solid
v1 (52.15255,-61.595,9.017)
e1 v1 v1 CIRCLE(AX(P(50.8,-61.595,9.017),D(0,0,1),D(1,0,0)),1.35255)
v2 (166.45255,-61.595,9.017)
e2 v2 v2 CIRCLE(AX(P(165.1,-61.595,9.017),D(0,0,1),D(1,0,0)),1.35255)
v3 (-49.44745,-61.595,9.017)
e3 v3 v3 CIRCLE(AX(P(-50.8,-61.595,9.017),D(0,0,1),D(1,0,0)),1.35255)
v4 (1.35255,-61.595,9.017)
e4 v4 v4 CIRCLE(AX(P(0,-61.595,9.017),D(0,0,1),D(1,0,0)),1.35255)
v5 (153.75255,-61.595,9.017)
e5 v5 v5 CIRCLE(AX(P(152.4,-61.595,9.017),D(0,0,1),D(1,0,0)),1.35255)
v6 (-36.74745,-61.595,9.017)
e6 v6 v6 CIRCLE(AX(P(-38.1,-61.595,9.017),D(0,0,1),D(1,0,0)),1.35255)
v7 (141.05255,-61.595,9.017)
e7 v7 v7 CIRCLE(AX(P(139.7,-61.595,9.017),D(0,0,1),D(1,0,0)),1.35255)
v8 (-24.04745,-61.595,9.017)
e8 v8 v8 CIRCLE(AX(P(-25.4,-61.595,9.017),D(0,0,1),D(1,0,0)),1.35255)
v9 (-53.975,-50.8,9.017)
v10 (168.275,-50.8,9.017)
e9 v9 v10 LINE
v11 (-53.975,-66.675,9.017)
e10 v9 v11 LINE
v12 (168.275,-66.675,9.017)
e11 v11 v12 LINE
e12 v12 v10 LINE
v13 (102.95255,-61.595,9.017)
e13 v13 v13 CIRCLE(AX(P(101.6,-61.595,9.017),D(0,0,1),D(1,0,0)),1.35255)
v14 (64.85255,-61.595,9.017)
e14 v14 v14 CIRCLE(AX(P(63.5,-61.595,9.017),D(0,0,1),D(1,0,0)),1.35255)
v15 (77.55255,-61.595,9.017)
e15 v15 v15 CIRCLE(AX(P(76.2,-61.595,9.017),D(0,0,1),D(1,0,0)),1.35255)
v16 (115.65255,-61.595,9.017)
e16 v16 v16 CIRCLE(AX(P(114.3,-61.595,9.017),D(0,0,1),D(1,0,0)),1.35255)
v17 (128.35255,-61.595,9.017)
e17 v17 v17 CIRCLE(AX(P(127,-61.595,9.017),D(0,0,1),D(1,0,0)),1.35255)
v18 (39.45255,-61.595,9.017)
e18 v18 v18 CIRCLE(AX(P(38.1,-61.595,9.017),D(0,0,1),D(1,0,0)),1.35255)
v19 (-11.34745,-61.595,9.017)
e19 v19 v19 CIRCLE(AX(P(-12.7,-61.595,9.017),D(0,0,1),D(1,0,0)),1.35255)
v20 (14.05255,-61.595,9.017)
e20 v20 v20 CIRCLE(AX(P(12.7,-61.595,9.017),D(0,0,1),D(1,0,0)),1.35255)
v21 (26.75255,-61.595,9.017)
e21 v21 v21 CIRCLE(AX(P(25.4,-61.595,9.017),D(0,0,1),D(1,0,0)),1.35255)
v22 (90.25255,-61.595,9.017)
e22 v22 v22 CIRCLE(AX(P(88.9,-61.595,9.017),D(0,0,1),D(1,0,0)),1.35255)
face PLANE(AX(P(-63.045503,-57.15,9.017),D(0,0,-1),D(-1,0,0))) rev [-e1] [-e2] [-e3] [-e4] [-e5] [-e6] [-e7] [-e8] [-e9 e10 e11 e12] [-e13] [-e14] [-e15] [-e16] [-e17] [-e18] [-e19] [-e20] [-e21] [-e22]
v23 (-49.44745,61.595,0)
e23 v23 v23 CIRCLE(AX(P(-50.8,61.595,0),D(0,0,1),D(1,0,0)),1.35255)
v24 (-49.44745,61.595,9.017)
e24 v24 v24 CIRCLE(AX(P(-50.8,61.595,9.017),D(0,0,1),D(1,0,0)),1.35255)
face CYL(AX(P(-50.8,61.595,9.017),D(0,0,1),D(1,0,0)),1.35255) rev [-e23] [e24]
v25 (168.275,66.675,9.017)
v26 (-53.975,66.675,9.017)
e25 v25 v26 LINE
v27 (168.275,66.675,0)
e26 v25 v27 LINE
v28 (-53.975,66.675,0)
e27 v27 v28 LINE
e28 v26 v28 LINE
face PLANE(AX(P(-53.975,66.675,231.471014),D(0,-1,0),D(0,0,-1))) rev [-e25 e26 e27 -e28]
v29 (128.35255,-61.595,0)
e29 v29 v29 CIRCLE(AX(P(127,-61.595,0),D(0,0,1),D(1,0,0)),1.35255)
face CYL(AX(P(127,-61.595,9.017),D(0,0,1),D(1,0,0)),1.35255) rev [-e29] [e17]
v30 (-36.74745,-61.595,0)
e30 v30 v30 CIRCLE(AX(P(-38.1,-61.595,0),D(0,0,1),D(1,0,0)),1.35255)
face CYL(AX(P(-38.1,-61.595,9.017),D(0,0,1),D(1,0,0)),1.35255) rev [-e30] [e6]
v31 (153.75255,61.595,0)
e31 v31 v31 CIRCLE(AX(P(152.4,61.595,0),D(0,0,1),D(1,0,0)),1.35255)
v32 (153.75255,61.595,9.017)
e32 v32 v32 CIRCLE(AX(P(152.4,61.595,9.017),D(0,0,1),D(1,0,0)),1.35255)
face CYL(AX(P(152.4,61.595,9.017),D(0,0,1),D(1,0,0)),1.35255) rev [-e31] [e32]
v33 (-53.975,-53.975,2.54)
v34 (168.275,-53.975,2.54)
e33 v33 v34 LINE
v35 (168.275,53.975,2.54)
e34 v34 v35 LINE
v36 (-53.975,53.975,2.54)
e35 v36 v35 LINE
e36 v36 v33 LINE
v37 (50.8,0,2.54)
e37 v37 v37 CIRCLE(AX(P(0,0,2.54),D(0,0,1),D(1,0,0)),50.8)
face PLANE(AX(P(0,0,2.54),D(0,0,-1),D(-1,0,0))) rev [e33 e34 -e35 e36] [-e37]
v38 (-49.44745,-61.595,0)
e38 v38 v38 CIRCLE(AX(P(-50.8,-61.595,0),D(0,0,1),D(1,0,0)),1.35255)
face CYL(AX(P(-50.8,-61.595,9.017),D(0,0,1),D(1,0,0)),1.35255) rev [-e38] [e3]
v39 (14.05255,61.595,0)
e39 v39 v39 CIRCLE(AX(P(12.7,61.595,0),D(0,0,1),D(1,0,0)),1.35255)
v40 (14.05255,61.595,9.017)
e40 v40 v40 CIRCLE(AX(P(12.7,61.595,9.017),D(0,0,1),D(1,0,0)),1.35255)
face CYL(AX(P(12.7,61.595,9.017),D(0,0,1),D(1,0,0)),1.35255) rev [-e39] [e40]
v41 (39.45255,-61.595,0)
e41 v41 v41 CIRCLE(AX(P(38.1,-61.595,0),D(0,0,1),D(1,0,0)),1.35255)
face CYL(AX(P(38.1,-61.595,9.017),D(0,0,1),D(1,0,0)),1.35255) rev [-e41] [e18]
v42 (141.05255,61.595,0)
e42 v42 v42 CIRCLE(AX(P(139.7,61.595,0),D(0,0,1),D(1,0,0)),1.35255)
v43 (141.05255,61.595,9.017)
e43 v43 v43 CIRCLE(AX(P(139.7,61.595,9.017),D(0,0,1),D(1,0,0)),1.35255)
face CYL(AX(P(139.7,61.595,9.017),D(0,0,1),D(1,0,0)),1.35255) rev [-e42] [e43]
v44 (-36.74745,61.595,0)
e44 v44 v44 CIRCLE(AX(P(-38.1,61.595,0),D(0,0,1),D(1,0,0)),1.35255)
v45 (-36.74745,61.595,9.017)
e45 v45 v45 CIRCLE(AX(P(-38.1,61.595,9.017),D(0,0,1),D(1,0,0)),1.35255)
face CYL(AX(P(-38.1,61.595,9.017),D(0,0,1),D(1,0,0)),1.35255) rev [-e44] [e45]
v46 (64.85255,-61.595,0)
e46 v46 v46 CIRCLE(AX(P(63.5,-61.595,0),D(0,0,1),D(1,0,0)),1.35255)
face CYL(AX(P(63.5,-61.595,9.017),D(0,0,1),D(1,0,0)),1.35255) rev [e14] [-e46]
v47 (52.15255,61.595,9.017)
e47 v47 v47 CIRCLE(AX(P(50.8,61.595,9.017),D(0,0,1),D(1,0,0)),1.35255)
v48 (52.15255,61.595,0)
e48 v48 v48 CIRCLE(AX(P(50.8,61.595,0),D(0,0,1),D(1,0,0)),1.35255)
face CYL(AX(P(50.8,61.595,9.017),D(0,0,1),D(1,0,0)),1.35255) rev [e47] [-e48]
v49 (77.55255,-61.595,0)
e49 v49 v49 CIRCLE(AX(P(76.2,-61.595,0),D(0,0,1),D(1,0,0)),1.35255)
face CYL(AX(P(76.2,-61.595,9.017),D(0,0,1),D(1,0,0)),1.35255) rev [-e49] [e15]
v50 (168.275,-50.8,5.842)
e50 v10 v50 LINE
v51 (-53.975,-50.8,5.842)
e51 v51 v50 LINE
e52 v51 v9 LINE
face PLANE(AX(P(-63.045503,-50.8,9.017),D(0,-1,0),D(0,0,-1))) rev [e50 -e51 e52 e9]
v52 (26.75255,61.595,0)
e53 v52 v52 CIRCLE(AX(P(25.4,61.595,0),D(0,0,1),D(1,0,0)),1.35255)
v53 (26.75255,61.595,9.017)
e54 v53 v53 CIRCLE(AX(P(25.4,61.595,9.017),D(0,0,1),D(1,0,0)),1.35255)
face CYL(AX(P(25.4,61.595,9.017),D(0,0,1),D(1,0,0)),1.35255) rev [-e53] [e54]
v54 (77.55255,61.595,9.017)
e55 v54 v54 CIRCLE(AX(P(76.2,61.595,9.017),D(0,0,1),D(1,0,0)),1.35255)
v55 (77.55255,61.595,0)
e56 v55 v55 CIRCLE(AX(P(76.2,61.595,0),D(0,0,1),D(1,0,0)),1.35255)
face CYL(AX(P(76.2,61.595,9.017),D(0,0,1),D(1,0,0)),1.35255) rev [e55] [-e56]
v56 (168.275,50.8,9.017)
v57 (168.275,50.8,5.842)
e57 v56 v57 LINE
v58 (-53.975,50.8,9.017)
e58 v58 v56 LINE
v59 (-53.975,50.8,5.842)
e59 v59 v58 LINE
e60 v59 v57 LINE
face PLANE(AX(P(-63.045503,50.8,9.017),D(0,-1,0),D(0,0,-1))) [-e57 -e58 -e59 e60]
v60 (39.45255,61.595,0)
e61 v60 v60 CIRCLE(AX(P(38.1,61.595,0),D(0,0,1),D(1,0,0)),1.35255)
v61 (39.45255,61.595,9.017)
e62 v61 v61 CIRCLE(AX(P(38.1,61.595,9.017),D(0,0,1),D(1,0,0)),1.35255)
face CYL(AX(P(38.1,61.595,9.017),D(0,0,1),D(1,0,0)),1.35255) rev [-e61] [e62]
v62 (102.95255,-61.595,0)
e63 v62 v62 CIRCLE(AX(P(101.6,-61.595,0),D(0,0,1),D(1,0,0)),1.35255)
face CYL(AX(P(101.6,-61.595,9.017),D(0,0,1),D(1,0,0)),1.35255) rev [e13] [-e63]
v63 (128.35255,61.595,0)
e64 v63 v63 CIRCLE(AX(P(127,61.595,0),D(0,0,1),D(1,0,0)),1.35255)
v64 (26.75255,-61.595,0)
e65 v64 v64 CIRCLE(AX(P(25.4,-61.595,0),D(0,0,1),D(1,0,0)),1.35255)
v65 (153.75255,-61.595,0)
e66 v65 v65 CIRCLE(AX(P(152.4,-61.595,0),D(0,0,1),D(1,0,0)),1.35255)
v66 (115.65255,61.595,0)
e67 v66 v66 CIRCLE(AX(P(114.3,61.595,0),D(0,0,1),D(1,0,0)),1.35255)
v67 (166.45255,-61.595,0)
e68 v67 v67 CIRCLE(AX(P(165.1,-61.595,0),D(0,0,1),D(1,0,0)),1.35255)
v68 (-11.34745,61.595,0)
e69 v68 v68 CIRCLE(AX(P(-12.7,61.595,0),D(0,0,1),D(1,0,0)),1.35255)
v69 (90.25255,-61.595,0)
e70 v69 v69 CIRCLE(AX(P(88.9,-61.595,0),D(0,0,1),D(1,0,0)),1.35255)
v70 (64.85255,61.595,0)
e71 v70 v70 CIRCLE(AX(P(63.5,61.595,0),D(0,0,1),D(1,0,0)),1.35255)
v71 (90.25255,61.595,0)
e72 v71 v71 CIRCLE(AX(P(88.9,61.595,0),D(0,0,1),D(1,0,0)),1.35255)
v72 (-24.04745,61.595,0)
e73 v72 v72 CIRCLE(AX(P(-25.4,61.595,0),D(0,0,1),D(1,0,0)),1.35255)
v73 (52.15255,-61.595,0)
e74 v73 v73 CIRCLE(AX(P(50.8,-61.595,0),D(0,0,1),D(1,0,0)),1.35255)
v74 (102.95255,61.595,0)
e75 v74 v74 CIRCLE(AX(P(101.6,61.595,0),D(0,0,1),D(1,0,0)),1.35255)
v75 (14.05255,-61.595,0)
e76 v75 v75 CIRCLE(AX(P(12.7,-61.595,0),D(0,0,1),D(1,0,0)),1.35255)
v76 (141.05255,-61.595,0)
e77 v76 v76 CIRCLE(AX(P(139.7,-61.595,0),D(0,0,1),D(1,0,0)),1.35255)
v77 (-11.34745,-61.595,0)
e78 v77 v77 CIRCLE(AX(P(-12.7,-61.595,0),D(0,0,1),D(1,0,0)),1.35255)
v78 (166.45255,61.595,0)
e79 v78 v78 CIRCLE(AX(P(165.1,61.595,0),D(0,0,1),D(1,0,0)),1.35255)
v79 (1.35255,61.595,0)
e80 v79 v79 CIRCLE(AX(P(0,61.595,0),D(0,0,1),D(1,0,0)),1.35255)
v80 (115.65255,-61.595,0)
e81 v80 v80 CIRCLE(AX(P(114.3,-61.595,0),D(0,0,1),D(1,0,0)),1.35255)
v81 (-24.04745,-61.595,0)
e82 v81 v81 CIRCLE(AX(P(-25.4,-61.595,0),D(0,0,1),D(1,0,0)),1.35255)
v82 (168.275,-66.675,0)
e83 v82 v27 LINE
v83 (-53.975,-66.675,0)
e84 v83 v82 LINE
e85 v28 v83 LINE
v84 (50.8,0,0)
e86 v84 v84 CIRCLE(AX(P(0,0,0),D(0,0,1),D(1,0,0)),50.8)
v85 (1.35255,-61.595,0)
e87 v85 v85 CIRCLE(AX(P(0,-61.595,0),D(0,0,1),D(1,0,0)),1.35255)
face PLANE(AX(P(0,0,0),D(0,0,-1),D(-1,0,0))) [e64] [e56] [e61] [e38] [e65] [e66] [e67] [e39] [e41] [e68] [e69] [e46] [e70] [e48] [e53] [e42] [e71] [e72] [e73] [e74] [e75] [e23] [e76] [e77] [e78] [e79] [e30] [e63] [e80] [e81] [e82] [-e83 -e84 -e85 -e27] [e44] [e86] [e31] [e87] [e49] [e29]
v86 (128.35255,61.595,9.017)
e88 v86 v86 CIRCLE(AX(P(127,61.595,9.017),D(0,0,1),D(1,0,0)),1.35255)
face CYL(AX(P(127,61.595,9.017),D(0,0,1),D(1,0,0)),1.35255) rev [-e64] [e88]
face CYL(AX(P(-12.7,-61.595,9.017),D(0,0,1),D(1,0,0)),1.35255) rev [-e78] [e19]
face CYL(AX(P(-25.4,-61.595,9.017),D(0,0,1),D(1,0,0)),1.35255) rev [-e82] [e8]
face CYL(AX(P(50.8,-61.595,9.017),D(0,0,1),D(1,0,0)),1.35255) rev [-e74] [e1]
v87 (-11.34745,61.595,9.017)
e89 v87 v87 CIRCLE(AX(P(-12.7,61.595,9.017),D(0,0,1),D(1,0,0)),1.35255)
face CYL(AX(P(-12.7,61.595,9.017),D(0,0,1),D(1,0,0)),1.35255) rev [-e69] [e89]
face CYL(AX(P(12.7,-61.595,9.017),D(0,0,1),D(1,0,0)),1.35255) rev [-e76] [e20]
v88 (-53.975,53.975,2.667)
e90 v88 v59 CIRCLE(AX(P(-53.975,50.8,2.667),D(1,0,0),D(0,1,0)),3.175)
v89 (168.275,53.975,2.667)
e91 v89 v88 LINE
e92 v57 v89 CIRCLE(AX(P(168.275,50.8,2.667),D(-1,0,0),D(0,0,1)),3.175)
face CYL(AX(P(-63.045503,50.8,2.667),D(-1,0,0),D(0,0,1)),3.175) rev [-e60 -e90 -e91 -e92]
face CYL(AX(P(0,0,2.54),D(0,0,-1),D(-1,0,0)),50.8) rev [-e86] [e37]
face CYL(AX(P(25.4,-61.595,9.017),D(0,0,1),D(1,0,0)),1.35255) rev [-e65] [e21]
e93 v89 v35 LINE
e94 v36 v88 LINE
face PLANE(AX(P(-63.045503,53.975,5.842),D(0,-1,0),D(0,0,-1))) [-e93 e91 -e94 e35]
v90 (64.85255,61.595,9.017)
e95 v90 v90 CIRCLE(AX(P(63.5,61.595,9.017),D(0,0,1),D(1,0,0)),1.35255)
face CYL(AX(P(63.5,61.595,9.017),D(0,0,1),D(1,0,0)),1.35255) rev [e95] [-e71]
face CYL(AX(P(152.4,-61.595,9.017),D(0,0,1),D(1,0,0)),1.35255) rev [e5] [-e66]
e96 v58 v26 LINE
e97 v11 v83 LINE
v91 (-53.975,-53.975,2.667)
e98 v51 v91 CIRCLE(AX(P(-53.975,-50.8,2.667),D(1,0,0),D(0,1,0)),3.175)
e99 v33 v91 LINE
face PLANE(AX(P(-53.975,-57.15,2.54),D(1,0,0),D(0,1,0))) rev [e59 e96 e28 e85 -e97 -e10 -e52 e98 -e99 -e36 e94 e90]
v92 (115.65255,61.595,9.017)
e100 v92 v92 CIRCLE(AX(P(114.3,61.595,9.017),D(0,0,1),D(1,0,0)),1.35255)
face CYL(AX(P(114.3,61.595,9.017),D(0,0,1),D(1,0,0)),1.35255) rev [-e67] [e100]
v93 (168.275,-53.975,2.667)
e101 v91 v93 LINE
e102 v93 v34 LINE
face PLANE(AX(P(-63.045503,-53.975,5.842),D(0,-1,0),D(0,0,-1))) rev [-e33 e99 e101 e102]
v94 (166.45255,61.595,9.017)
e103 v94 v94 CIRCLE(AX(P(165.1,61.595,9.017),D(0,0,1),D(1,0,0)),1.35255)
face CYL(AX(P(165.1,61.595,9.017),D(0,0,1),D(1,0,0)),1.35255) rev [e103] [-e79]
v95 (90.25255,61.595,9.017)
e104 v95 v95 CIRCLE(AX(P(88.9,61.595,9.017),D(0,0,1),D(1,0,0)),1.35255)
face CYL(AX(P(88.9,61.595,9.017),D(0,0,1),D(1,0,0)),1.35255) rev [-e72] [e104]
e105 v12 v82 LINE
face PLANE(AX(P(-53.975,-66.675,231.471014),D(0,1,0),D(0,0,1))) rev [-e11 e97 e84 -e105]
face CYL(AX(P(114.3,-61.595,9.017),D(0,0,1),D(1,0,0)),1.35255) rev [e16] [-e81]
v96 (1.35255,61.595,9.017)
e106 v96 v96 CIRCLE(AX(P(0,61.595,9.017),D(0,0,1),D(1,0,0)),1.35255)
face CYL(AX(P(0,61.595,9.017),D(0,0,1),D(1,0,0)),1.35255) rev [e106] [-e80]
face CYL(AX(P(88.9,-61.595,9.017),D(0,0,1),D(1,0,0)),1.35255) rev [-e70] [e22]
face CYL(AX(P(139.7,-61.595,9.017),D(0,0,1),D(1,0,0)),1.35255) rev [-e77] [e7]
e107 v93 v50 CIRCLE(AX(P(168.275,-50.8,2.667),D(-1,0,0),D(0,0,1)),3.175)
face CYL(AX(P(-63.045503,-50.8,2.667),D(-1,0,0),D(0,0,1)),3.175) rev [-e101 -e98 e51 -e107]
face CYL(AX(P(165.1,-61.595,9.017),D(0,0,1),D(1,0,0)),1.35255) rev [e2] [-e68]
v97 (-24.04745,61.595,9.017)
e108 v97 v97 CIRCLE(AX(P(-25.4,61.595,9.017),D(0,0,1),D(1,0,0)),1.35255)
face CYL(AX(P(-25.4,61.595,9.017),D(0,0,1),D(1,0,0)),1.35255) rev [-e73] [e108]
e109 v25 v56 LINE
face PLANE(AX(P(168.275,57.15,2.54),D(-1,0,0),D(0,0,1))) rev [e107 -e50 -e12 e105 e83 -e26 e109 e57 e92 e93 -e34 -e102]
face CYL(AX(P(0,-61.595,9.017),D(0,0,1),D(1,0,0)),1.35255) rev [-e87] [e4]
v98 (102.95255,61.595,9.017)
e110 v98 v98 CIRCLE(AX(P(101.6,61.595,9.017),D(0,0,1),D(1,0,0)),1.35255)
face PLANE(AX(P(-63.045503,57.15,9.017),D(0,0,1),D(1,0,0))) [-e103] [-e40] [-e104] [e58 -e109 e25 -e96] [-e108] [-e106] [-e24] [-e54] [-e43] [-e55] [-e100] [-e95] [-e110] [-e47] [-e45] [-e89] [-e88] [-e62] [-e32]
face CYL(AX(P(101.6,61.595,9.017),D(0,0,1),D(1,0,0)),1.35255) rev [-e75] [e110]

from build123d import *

# Parameters (mm, degrees)
SKETCH1_W             = 222.25
SKETCH1_H             = 114.3
SKETCH1_R             = 50.8
BOSS_EXTRUDE1_DEPTH   = 2.54
BOSS_EXTRUDE2_DEPTH   = 222.25
SKETCH4_W             = 222.25
SKETCH4_H             = 9.525
BOSS_EXTRUDE3_DEPTH   = 9.017
F_6_32_TAPPED_HOLE1_D = 2.7051
LPATTERN1_COUNT       = 18
LPATTERN1_PITCH       = 12.7
FILLET1_R             = 3.175


with BuildPart() as part:
    # Sketch1 → Boss-Extrude1 (new body)
    with BuildSketch(Plane.XY):
        with Locations((57.15, 0)):
            Rectangle(SKETCH1_W, SKETCH1_H)
        Circle(SKETCH1_R, mode=Mode.SUBTRACT)
    extrude(amount=BOSS_EXTRUDE1_DEPTH)

    # Sketch3 → Boss-Extrude2 (add)
    with BuildSketch(Plane(origin=(168.275, 0, 0), x_dir=(0, 0, -1), z_dir=(1, 0, 0))):
        Polygon((-2.54, 57.15), (-9.017, 57.15), (-9.017, 50.8), (-5.842, 50.8), (-5.842, 53.975), (-2.54, 53.975), align=None)
    boss_extrude2 = extrude(amount=-BOSS_EXTRUDE2_DEPTH)

    # Mirror1: Boss-Extrude2 across plane
    add(boss_extrude2.mirror(Plane(origin=(0, 0, 0), x_dir=(0, 0, 1), z_dir=(0, -1, 0))))

    # Sketch4 → Boss-Extrude3 (add)
    with BuildSketch(Plane.XY):
        with Locations((57.15, -61.9125)):
            Rectangle(SKETCH4_W, SKETCH4_H)
        with Locations((57.15, 61.9125)):
            Rectangle(SKETCH4_W, SKETCH4_H)
    extrude(amount=BOSS_EXTRUDE3_DEPTH)

    # #6-32 Tapped Hole1 (through all)
    with Locations(Plane.XY.offset(9.017)):
        with Locations((-50.8, -61.595), (-50.8, 61.595)):
            f_6_32_tapped_hole1 = Hole(F_6_32_TAPPED_HOLE1_D / 2)

    # LPattern1: #6-32 Tapped Hole1 ×18
    with Locations(*[(i * LPATTERN1_PITCH, 0, 0) for i in range(1, LPATTERN1_COUNT)]):
        add(f_6_32_tapped_hole1, mode=Mode.SUBTRACT)

    # Fillet1
    fillet1_edges = [part.edges().sort_by_distance(p)[0] for p in [
        (57.15, 53.975, 5.842),
        (57.15, -53.975, 5.842),
    ]]
    fillet(fillet1_edges, radius=FILLET1_R - 0.0001)  # a hair under: the kernel refuses the full size


solid = part.part
